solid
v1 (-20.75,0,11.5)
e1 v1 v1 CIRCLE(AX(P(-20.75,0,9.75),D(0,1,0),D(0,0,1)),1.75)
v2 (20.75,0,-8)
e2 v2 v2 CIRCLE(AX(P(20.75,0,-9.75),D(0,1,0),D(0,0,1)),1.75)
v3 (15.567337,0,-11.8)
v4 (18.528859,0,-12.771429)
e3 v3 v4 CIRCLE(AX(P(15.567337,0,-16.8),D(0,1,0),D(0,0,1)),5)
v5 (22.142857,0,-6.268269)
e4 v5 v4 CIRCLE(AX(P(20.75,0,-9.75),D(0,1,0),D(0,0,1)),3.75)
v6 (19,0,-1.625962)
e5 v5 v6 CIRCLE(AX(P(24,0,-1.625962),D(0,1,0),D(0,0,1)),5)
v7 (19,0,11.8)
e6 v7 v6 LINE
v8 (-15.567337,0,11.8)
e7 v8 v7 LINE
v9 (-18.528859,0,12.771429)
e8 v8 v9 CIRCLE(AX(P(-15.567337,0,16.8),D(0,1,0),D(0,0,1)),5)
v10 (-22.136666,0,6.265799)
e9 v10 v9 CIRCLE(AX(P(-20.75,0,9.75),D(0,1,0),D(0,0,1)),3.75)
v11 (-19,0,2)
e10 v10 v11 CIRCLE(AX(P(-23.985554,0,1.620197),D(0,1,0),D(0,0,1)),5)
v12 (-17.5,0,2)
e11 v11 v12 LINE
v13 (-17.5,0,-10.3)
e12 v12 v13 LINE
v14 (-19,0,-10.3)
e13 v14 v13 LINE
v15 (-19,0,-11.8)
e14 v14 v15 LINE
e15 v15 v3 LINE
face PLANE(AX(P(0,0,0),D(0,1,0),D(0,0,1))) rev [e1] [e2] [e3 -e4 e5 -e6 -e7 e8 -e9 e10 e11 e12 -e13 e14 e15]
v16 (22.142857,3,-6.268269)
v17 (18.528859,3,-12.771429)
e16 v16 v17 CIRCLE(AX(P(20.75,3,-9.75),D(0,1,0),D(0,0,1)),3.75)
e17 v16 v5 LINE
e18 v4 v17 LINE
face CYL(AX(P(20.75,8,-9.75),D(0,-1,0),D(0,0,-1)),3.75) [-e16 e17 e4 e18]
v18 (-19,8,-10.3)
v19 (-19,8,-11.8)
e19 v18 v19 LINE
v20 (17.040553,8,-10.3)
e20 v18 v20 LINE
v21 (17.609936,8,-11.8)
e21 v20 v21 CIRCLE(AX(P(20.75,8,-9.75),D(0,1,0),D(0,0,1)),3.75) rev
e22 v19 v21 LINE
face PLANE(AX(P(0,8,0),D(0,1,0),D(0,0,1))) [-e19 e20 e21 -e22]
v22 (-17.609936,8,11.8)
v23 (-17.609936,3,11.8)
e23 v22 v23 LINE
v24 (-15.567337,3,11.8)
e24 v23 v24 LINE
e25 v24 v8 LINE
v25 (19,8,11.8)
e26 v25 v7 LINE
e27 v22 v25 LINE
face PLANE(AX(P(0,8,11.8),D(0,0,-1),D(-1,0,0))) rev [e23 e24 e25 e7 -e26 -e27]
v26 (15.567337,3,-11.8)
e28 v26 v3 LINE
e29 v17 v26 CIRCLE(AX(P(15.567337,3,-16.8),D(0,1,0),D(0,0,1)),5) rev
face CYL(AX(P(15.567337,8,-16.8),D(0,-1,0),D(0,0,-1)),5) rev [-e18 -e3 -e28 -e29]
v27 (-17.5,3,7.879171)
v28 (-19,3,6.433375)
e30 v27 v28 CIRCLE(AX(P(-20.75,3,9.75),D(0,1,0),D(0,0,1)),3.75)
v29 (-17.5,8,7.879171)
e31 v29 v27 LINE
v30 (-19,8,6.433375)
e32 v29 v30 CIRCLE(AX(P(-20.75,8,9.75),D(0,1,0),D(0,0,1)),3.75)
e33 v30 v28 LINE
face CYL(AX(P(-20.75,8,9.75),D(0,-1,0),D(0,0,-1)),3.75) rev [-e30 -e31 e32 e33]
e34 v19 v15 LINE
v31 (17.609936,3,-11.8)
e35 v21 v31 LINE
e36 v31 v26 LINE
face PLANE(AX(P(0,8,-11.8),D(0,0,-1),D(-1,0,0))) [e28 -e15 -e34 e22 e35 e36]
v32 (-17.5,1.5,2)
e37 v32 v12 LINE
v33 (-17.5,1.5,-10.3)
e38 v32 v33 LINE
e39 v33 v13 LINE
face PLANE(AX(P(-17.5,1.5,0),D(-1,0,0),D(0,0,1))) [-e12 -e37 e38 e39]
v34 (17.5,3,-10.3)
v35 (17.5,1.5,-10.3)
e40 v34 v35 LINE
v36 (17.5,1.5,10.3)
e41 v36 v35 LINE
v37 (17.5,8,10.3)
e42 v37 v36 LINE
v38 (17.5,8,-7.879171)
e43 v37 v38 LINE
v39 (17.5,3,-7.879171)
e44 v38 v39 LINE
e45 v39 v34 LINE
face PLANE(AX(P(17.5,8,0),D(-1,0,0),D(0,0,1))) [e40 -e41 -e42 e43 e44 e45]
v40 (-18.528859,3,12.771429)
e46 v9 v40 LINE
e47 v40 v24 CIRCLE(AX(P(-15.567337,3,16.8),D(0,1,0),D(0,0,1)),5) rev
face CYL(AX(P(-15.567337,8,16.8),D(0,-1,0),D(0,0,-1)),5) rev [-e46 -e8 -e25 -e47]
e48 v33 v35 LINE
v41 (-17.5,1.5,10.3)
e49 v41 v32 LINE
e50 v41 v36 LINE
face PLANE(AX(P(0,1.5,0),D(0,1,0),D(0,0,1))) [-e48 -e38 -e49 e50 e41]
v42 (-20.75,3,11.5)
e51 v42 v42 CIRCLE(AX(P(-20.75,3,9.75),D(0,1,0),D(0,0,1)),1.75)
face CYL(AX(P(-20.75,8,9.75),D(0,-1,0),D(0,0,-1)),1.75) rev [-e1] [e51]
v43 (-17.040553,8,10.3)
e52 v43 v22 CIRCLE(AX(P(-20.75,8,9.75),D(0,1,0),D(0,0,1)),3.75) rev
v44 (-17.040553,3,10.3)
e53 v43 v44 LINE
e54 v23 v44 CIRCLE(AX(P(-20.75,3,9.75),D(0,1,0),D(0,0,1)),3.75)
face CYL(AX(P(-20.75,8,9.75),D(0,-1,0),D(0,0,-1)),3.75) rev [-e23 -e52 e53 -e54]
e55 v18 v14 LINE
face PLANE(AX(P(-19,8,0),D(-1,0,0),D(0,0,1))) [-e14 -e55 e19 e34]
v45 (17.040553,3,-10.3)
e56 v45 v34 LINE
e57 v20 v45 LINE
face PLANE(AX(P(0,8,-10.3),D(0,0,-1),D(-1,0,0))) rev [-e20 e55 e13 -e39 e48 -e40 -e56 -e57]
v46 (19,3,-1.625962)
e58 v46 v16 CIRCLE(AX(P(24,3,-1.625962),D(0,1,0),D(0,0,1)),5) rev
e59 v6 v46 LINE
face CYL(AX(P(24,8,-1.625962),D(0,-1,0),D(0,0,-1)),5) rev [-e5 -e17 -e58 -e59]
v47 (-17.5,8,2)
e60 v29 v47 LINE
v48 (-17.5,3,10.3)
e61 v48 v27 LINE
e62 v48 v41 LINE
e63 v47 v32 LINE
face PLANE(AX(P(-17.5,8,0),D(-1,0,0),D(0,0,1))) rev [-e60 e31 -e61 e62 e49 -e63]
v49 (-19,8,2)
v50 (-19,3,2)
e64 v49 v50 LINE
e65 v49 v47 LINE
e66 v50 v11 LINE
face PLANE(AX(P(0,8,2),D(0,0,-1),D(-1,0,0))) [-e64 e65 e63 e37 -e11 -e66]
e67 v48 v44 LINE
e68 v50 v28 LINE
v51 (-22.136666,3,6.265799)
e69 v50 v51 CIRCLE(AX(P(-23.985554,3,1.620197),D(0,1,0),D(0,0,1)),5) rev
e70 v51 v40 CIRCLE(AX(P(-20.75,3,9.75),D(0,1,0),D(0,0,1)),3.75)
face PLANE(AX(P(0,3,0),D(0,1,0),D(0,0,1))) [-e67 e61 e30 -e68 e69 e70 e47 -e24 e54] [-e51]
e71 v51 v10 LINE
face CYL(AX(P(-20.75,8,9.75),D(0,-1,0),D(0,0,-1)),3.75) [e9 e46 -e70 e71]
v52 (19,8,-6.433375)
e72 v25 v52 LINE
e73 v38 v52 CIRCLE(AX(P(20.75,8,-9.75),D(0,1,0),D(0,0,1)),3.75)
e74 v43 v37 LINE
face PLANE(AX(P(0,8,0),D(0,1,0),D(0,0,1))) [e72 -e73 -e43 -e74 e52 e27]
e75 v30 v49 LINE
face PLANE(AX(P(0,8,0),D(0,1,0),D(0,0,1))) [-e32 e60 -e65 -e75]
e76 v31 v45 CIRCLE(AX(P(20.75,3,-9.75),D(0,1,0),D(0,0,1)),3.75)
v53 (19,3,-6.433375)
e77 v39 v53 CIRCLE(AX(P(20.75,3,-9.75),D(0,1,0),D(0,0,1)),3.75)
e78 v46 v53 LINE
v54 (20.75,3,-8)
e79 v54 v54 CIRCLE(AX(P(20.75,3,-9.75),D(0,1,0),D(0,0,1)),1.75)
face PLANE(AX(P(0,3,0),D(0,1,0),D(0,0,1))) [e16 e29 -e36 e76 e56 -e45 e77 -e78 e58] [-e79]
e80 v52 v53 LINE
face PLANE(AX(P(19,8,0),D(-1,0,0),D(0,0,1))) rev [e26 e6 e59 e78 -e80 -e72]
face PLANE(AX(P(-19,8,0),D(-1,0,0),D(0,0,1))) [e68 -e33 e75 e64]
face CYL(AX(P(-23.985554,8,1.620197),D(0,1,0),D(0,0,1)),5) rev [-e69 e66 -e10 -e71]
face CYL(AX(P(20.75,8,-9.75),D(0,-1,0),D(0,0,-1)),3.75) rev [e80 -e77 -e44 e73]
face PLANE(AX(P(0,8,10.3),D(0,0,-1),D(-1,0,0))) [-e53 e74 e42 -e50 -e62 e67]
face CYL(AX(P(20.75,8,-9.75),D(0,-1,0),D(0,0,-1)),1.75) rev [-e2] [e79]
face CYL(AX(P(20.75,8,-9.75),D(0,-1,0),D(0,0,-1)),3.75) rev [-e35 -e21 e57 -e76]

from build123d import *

# Parameters (mm, degrees)
SKETCH1_W           = 35
SKETCH1_H           = 20.6
BOSS_EXTRUDE1_DEPTH = 1.5
SKETCH1_3_R         = 1.75
BOSS_EXTRUDE2_DEPTH = 8
CUT_EXTRUDE1_START  = 3
SKETCH1_5_R         = 3.75
CUT_EXTRUDE1_DEPTH  = 27.094673052
FILLET1_R           = 5


with BuildPart() as part:
    # Sketch1 → Boss-Extrude1 (new body)
    with BuildSketch(Plane(origin=(0, 0, 0), x_dir=(1, 0, 0), z_dir=(0, 1, 0))):
        Rectangle(SKETCH1_W, SKETCH1_H)
        with BuildLine():
            Line((-17.5, -10.3), (-17.040552602, -10.3))
            ThreePointArc((-17.040552602, -10.3), (-17.010151892, -10.025746493), (-17, -9.75))
            ThreePointArc((-17, -9.75), (-17.127155813, -8.781754163), (-17.5, -7.879171307))
            Line((-17.5, -7.879171307), (-17.5, -10.3))
        make_face()
        with BuildLine():
            ThreePointArc((17.040552602, 10.3), (17.065766034, 9.050771792), (17.5, 7.879171307))
            Line((17.5, 7.879171307), (17.5, 10.3))
            Line((17.5, 10.3), (17.040552602, 10.3))
        make_face()
    extrude(amount=BOSS_EXTRUDE1_DEPTH)

    # Sketch1<3> → Boss-Extrude2 (add)
    with BuildSketch(Plane(origin=(0, 0, 0), x_dir=(1, 0, 0), z_dir=(0, 1, 0))):
        with BuildLine():
            Line((-17.5, -10.3), (-17.5, -2))
            Line((-17.5, -2), (-19, -2))
            Line((-19, -2), (-19, -6.43337521))
            ThreePointArc((-19, -6.43337521), (-24.380199188, -10.690294559), (-17.609936306, -11.8))
            Line((-17.609936306, -11.8), (19, -11.8))
            Line((19, -11.8), (19, 6.43337521))
            ThreePointArc((19, 6.43337521), (24.380199188, 10.690294559), (17.609936306, 11.8))
            Line((17.609936306, 11.8), (-19, 11.8))
            Line((-19, 11.8), (-19, 10.3))
            Line((-19, 10.3), (17.5, 10.3))
            Line((17.5, 10.3), (17.5, -10.3))
            Line((17.5, -10.3), (-17.5, -10.3))
        make_face()
        with Locations(Location((-20.75, -9.75, 0), (0, 0, 270))):
            Circle(SKETCH1_3_R, mode=Mode.SUBTRACT)
        with Locations(Location((20.75, 9.75, 0), (0, 0, 270))):
            Circle(SKETCH1_3_R, mode=Mode.SUBTRACT)
    extrude(amount=BOSS_EXTRUDE2_DEPTH)

    # Sketch1<5> → Cut-Extrude1 (cut, through all)
    with BuildSketch(Plane(origin=(0, 0, 0), x_dir=(1, 0, 0), z_dir=(0, 1, 0)).offset(CUT_EXTRUDE1_START)):
        with Locations((20.75, 9.75)):
            Circle(SKETCH1_5_R)
        with Locations((-20.75, -9.75)):
            Circle(SKETCH1_5_R)
    extrude(amount=CUT_EXTRUDE1_DEPTH, mode=Mode.SUBTRACT)

    # Fillet1
    # the kernel refuses this fillet: 5 mm, written as the material it adds along each edge
    with BuildSketch(Plane(origin=(-19, 0, 6.43337521), x_dir=(-0.9985759338365271, 0, -0.05334889279551997), z_dir=(0, 1, 0))) as fillet1_piece_1:
        with BuildLine():
            CenterArc((5.235232079, -4.540349679), FILLET1_R, 114.760021094, 63.94168422)
            Line((0.236515659, -4.42706179), (0, 0))
            ThreePointArc((0, 0), (1.570569624, -0.34473774), (3.141139248, 0))
        make_face()
    extrude(amount=3)
    with BuildSketch(Plane(origin=(-17.609936306, 0, 11.8), x_dir=(-0.6872011618867198, 0, 0.7264671796451251), z_dir=(0, 1, 0))) as fillet1_piece_2:
        with BuildLine():
            CenterArc((2.228659001, 4.919887463), FILLET1_R, 223.40896289, 36.320705761)
            Line((-1.403676897, 1.483881654), (0, 0))
            ThreePointArc((0, 0), (0.6685977, 0.060084403), (1.337195401, 0))
        make_face()
    extrude(amount=3)
    with BuildSketch(Plane(origin=(17.609936306, 0, -11.8), x_dir=(-1, 0, 0), z_dir=(0, 1, 0))) as fillet1_piece_3:
        with BuildLine():
            CenterArc((2.042599714, -5), FILLET1_R, 90, 36.320705761)
            ThreePointArc((-0.918922233, -0.971428571), (-0.41581177, -0.527004357), (0, 0))
            Line((0, 0), (2.042599714, 0))
        make_face()
    extrude(amount=3)
    with BuildSketch(Plane(origin=(19, 0, -6.43337521), x_dir=(0.9986229541246332, 0, 0.052461371459300826), z_dir=(0, 1, 0))) as fillet1_piece_4:
        with BuildLine():
            CenterArc((5.245318282, -4.538486728), FILLET1_R, 114.810943637, 68.196252011)
            Line((0.252203511, -4.800793585), (0, 0))
            ThreePointArc((0, 0), (1.573595485, -0.346134954), (3.147190969, 0))
        make_face()
    extrude(amount=3)


solid = part.part
